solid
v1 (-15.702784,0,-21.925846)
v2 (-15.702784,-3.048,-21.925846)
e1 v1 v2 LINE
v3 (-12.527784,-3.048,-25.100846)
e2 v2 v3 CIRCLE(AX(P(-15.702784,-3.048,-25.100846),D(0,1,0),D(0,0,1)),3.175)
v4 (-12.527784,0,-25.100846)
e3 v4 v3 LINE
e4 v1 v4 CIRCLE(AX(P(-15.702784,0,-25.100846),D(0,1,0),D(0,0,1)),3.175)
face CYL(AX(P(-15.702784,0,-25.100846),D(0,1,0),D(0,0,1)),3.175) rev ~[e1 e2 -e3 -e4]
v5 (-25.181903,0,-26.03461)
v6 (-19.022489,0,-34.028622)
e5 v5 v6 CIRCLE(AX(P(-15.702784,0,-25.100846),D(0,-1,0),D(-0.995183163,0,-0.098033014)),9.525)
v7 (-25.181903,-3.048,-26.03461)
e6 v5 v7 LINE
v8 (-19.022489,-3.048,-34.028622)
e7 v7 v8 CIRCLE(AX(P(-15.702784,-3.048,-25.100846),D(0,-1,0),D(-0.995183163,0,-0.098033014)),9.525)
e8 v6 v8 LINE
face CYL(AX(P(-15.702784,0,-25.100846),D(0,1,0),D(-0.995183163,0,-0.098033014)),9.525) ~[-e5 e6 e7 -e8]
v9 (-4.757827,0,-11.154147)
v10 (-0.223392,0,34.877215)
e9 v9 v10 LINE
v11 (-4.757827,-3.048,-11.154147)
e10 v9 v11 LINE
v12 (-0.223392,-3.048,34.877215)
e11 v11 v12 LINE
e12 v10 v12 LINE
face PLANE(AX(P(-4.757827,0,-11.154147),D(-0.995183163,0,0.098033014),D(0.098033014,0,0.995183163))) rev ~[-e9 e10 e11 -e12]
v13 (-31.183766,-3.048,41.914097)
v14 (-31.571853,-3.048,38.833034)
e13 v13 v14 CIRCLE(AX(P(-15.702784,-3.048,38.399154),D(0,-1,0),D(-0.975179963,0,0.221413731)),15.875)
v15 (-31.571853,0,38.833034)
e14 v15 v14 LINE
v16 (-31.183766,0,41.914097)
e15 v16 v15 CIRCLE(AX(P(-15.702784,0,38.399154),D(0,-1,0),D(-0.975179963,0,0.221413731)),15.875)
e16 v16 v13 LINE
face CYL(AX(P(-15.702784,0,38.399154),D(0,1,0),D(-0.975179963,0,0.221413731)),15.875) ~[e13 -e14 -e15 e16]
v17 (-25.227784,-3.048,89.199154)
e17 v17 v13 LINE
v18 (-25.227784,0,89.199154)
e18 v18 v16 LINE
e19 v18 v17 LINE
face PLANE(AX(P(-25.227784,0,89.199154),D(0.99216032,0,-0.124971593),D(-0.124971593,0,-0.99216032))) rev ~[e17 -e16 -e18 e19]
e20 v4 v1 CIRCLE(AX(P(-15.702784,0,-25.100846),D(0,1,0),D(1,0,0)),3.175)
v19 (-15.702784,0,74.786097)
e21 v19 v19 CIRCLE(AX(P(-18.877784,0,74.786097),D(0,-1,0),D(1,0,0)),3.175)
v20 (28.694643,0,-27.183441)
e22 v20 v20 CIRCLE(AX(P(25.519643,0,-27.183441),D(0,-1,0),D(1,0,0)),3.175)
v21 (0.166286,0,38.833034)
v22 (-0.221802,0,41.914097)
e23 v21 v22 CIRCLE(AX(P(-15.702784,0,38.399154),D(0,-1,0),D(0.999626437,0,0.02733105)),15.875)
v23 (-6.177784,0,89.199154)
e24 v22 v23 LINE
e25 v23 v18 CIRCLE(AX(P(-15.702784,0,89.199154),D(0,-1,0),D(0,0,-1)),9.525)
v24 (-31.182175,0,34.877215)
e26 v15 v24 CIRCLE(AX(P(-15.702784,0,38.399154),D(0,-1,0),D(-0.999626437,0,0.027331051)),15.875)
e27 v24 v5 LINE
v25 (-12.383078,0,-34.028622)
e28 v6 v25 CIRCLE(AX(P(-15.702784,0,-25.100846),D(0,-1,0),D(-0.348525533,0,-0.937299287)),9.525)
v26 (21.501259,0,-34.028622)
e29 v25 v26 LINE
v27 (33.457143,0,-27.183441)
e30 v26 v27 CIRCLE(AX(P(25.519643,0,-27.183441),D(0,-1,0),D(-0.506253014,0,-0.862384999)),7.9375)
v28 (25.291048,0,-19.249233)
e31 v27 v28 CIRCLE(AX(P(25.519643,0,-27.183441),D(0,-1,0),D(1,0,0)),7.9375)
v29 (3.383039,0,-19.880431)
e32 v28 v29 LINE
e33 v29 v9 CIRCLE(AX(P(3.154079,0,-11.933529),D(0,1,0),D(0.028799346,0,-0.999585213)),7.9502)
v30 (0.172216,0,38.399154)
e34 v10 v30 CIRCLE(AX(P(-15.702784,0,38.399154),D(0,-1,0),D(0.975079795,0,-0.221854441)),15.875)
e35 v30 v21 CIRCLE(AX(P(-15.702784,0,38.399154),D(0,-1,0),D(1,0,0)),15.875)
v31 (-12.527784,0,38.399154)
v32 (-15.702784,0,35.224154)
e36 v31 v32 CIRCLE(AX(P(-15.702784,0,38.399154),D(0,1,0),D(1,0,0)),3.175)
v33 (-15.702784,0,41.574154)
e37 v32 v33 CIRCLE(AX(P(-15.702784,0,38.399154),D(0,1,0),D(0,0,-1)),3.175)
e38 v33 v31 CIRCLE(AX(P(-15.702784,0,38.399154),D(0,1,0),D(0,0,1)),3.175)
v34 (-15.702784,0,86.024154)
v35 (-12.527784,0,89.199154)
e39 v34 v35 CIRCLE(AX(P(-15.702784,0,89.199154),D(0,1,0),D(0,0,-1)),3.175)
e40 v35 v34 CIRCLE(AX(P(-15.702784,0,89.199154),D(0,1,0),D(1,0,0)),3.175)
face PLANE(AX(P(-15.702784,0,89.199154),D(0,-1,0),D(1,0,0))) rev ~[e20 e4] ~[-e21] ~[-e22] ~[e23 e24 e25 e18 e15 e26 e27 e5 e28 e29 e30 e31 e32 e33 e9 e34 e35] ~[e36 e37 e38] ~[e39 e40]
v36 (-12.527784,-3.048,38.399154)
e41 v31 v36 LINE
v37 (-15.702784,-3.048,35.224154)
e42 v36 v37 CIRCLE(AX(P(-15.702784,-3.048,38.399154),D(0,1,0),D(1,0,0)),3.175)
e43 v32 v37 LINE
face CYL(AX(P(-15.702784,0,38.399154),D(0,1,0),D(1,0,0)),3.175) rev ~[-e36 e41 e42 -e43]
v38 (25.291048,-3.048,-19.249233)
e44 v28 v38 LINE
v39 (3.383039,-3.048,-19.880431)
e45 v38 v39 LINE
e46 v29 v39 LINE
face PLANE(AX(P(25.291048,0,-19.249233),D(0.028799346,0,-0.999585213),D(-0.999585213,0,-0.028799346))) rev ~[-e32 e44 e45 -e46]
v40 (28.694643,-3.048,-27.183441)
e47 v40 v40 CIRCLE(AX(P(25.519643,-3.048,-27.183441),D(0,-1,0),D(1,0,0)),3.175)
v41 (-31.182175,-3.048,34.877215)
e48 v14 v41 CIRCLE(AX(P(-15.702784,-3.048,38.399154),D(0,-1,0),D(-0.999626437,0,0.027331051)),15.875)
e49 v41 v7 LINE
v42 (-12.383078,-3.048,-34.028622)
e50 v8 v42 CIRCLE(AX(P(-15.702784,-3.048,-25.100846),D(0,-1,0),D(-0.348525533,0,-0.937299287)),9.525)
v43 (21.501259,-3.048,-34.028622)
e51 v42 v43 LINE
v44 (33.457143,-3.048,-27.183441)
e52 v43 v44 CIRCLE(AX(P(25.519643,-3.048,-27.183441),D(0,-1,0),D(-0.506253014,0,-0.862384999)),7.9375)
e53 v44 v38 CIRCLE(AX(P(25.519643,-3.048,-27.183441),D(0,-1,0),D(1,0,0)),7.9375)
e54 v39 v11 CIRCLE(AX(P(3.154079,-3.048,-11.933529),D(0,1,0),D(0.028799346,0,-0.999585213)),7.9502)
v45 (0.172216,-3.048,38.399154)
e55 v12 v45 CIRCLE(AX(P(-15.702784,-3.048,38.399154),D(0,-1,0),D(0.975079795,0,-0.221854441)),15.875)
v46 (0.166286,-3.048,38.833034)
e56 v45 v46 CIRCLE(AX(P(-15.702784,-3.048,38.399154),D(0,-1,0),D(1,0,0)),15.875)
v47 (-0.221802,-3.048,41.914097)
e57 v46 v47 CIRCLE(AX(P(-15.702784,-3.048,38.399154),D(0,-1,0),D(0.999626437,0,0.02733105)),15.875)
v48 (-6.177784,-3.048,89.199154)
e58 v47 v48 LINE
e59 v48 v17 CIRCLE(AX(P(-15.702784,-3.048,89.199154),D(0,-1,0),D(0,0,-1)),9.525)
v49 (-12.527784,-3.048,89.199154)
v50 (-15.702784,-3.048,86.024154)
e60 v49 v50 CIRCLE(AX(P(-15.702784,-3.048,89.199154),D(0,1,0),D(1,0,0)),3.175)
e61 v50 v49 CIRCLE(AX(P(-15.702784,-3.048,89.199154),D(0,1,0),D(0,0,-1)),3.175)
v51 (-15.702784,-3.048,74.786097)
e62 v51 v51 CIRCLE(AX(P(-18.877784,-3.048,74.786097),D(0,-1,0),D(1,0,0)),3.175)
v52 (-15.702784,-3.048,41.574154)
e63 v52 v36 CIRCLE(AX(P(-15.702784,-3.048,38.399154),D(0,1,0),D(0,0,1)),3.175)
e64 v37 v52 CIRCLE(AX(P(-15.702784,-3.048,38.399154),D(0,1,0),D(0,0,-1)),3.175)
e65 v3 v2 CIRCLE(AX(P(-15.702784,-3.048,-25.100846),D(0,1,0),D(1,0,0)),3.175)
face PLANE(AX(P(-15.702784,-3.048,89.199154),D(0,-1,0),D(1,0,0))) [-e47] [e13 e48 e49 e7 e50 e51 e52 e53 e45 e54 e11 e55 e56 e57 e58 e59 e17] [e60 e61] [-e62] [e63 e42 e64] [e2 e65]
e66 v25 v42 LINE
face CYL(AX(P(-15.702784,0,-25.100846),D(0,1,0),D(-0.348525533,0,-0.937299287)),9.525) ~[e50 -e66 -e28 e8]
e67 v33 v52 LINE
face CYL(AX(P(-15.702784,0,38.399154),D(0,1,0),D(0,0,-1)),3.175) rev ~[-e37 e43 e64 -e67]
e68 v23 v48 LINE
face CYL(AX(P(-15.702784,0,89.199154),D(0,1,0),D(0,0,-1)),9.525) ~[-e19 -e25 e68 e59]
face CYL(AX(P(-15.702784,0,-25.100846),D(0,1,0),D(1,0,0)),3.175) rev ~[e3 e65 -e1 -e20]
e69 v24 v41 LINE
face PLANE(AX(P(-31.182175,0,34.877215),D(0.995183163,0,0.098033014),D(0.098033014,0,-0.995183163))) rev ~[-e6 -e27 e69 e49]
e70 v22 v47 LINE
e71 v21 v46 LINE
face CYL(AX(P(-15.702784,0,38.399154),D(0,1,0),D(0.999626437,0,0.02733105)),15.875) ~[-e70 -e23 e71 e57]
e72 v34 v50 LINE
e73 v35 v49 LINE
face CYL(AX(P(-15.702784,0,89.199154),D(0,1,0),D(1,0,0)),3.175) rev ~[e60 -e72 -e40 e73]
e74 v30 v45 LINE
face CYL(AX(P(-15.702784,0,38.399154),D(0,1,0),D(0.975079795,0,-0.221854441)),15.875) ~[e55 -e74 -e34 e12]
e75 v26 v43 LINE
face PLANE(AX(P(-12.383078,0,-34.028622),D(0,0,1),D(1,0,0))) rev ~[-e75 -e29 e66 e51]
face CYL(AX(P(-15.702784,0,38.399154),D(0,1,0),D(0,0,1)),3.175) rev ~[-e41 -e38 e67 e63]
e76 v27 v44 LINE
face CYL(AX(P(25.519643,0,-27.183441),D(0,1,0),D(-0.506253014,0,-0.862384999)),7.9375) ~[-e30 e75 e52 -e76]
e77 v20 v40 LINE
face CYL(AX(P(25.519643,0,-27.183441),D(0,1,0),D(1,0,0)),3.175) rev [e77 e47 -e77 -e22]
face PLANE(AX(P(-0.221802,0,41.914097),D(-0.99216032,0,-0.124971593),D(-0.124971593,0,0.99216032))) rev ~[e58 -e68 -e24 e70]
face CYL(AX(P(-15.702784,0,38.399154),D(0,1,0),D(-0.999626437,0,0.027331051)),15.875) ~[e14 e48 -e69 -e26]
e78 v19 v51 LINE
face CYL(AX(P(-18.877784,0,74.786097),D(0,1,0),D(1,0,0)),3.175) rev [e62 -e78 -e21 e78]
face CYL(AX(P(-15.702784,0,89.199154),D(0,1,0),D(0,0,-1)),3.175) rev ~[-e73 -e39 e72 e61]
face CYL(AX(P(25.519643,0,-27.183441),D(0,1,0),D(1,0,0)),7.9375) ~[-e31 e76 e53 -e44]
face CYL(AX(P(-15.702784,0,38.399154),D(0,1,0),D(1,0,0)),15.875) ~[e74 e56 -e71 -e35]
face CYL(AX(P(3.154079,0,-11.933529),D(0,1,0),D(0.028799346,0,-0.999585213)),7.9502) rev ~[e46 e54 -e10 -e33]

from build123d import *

# Parameters (mm, degrees)
F0_R     = 3.175
F1_DEPTH = 3.048


# Not quite as in the source:
# - a feature names something its author has since deleted; it is built from what else it names


with BuildPart() as f1:
    # F0 (on Front) → F1 (new body)
    with BuildSketch(Plane.XZ):
        with BuildLine():
            ThreePointArc((-25.2277835988, 89.1991540504), (-22.4379756896, 82.4639619596), (-15.7027835988, 79.6741540504))
            ThreePointArc((-15.7027835988, 79.6741540504), (-8.967591508, 82.4639619596), (-6.1777835988, 89.1991540504))
            ThreePointArc((-6.1777835988, 89.1991540504), (-15.7027835988, 98.7241540504), (-25.2277835988, 89.1991540504))
        make_face()
        with BuildLine():
            ThreePointArc((-12.5277835988, 89.1991540504), (-13.4577195686, 86.9540900201), (-15.7027835988, 86.0241540504))
            ThreePointArc((-15.7027835988, 86.0241540504), (-17.9478476291, 91.4442180807), (-12.5277835988, 89.1991540504))
        make_face(mode=Mode.SUBTRACT)
        with BuildLine():
            ThreePointArc((-6.1777835988, 89.1991540504), (-8.967591508, 82.4639619596), (-15.7027835988, 79.6741540504))
            Line((-15.7027835988, 79.6741540504), (-15.7027835988, 74.7860969014))
            Line((-15.7027835988, 74.7860969014), (-15.7027835988, 54.2741540504))
            ThreePointArc((-15.7027835988, 54.2741540504), (-5.7978377346, 50.8051071547), (-0.2218016911, 41.9140970332))
            Line((-0.2218016911, 41.9140970332), (-6.1777835988, 89.1991540504))
        make_face()
        with BuildLine():
            Line((-15.7027835988, 74.7860969014), (-15.7027835988, 79.6741540504))
            ThreePointArc((-15.7027835988, 79.6741540504), (-22.4379756896, 82.4639619596), (-25.2277835988, 89.1991540504))
            Line((-25.2277835988, 89.1991540504), (-31.1837655066, 41.9140970332))
            ThreePointArc((-31.1837655066, 41.9140970332), (-25.6077294631, 50.8051071547), (-15.7027835988, 54.2741540504))
            Line((-15.7027835988, 54.2741540504), (-15.7027835988, 74.7860969014))
        make_face()
        with Locations((-18.8777835988, 74.7860969014)):
            Circle(F0_R, mode=Mode.SUBTRACT)
        with BuildLine():
            ThreePointArc((-0.2218016911, 41.9140970332), (-5.7978377346, 50.8051071547), (-15.7027835988, 54.2741540504))
            Line((-15.7027835988, 54.2741540504), (-15.7027835988, 41.5741540504))
            ThreePointArc((-15.7027835988, 41.5741540504), (-13.4577195686, 40.6442180807), (-12.5277835988, 38.3991540504))
            ThreePointArc((-12.5277835988, 38.3991540504), (-13.4577195686, 36.1540900201), (-15.7027835988, 35.2241540504))
            Line((-15.7027835988, 35.2241540504), (-15.7027835988, 22.5241540504))
            ThreePointArc((-15.7027835988, 22.5241540504), (-5.8006414211, 25.990962994), (-0.2233918497, 34.8772148011))
            Line((-0.2233918497, 34.8772148011), (0.1662860895, 38.8330344781))
            Line((0.1662860895, 38.8330344781), (-0.2218016911, 41.9140970332))
        make_face()
        with BuildLine():
            Line((-15.7027835988, 41.5741540504), (-15.7027835988, 54.2741540504))
            ThreePointArc((-15.7027835988, 54.2741540504), (-25.6077294631, 50.8051071547), (-31.1837655066, 41.9140970332))
            Line((-31.1837655066, 41.9140970332), (-31.5718532872, 38.8330344781))
            Line((-31.5718532872, 38.8330344781), (-31.182175348, 34.8772148011))
            ThreePointArc((-31.182175348, 34.8772148011), (-25.6049257766, 25.990962994), (-15.7027835988, 22.5241540504))
            Line((-15.7027835988, 22.5241540504), (-15.7027835988, 35.2241540504))
            ThreePointArc((-15.7027835988, 35.2241540504), (-18.8777835988, 38.3991540504), (-15.7027835988, 41.5741540504))
        make_face()
        with BuildLine():
            Line((-31.5718532872, 38.8330344781), (-31.1837655066, 41.9140970332))
            ThreePointArc((-31.1837655066, 41.9140970332), (-31.4533286811, 40.3830780946), (-31.5718532872, 38.8330344781))
        make_face()
        with BuildLine():
            ThreePointArc((0.1662860895, 38.8330344781), (0.0477614834, 40.3830780946), (-0.2218016911, 41.9140970332))
            Line((-0.2218016911, 41.9140970332), (0.1662860895, 38.8330344781))
        make_face()
        with BuildLine():
            Line((-31.182175348, 34.8772148011), (-31.5718532872, 38.8330344781))
            ThreePointArc((-31.5718532872, 38.8330344781), (-31.5013163141, 36.8428799596), (-31.182175348, 34.8772148011))
        make_face()
        with BuildLine():
            ThreePointArc((0.1722164012, 38.3991540504), (0.170733754, 38.6161145273), (0.1662860895, 38.8330344781))
            Line((0.1662860895, 38.8330344781), (-0.2233918497, 34.8772148011))
            ThreePointArc((-0.2233918497, 34.8772148011), (0.0730043216, 36.6271098943), (0.1722164012, 38.3991540504))
        make_face()
        with BuildLine():
            ThreePointArc((-15.7027835988, 22.5241540504), (-25.6049257766, 25.990962994), (-31.182175348, 34.8772148011))
            Line((-31.182175348, 34.8772148011), (-25.181903228, -26.034610404))
            ThreePointArc((-25.181903228, -26.034610404), (-22.7603940807, -18.7043031892), (-15.7027835988, -15.5758459496))
            Line((-15.7027835988, -15.5758459496), (-15.7027835988, 22.5241540504))
        make_face()
        with BuildLine():
            Line((-4.7578265809, -11.1541468152), (-0.2233918497, 34.8772148011))
            ThreePointArc((-0.2233918497, 34.8772148011), (-5.8006414211, 25.990962994), (-15.7027835988, 22.5241540504))
            Line((-15.7027835988, 22.5241540504), (-15.7027835988, -15.5758459496))
            ThreePointArc((-15.7027835988, -15.5758459496), (-8.967591508, -18.3656538588), (-6.1777835988, -25.1008459496))
            ThreePointArc((-6.1777835988, -25.1008459496), (-7.8814722685, -30.5370867531), (-12.3830778926, -34.0286216538))
            Line((-12.3830778926, -34.0286216538), (21.5012593326, -34.0286216538))
            ThreePointArc((21.5012593326, -34.0286216538), (17.8308984551, -25.2118628548), (25.291047986, -19.2492330938))
            Line((25.291047986, -19.2492330938), (3.3830391656, -19.8804312387))
            ThreePointArc((3.3830391656, -19.8804312387), (-2.6591751738, -17.3567899438), (-4.7578265809, -11.1541468152))
        make_face()
        with BuildLine():
            ThreePointArc((-15.7027835988, -15.5758459496), (-22.7603940807, -18.7043031892), (-25.181903228, -26.034610404))
            ThreePointArc((-25.181903228, -26.034610404), (-23.2478837609, -30.9143722928), (-19.022489305, -34.0286216538))
            Line((-19.022489305, -34.0286216538), (-12.3830778926, -34.0286216538))
            ThreePointArc((-12.3830778926, -34.0286216538), (-7.8814722685, -30.5370867531), (-6.1777835988, -25.1008459496))
            ThreePointArc((-6.1777835988, -25.1008459496), (-8.967591508, -18.3656538588), (-15.7027835988, -15.5758459496))
        make_face()
        with BuildLine():
            ThreePointArc((-12.5277835988, -25.1008459496), (-17.9478476291, -27.3459099799), (-15.7027835988, -21.9258459496))
            ThreePointArc((-15.7027835988, -21.9258459496), (-13.4577195686, -22.8557819193), (-12.5277835988, -25.1008459496))
        make_face(mode=Mode.SUBTRACT)
        with BuildLine():
            Line((-12.3830778926, -34.0286216538), (-19.022489305, -34.0286216538))
            ThreePointArc((-19.022489305, -34.0286216538), (-15.7027835988, -34.6258459496), (-12.3830778926, -34.0286216538))
        make_face()
        with BuildLine():
            ThreePointArc((33.4571426277, -27.1834407253), (31.0508918664, -21.4905339011), (25.291047986, -19.2492330938))
            ThreePointArc((25.291047986, -19.2492330938), (17.8308984551, -25.2118628548), (21.5012593326, -34.0286216538))
            ThreePointArc((21.5012593326, -34.0286216538), (29.4634979017, -34.0718303649), (33.4571426277, -27.1834407253))
        make_face()
        with Locations((25.5196426277, -27.1834407253)):
            Circle(F0_R, mode=Mode.SUBTRACT)
    extrude(amount=F1_DEPTH)


solid = f1.part
